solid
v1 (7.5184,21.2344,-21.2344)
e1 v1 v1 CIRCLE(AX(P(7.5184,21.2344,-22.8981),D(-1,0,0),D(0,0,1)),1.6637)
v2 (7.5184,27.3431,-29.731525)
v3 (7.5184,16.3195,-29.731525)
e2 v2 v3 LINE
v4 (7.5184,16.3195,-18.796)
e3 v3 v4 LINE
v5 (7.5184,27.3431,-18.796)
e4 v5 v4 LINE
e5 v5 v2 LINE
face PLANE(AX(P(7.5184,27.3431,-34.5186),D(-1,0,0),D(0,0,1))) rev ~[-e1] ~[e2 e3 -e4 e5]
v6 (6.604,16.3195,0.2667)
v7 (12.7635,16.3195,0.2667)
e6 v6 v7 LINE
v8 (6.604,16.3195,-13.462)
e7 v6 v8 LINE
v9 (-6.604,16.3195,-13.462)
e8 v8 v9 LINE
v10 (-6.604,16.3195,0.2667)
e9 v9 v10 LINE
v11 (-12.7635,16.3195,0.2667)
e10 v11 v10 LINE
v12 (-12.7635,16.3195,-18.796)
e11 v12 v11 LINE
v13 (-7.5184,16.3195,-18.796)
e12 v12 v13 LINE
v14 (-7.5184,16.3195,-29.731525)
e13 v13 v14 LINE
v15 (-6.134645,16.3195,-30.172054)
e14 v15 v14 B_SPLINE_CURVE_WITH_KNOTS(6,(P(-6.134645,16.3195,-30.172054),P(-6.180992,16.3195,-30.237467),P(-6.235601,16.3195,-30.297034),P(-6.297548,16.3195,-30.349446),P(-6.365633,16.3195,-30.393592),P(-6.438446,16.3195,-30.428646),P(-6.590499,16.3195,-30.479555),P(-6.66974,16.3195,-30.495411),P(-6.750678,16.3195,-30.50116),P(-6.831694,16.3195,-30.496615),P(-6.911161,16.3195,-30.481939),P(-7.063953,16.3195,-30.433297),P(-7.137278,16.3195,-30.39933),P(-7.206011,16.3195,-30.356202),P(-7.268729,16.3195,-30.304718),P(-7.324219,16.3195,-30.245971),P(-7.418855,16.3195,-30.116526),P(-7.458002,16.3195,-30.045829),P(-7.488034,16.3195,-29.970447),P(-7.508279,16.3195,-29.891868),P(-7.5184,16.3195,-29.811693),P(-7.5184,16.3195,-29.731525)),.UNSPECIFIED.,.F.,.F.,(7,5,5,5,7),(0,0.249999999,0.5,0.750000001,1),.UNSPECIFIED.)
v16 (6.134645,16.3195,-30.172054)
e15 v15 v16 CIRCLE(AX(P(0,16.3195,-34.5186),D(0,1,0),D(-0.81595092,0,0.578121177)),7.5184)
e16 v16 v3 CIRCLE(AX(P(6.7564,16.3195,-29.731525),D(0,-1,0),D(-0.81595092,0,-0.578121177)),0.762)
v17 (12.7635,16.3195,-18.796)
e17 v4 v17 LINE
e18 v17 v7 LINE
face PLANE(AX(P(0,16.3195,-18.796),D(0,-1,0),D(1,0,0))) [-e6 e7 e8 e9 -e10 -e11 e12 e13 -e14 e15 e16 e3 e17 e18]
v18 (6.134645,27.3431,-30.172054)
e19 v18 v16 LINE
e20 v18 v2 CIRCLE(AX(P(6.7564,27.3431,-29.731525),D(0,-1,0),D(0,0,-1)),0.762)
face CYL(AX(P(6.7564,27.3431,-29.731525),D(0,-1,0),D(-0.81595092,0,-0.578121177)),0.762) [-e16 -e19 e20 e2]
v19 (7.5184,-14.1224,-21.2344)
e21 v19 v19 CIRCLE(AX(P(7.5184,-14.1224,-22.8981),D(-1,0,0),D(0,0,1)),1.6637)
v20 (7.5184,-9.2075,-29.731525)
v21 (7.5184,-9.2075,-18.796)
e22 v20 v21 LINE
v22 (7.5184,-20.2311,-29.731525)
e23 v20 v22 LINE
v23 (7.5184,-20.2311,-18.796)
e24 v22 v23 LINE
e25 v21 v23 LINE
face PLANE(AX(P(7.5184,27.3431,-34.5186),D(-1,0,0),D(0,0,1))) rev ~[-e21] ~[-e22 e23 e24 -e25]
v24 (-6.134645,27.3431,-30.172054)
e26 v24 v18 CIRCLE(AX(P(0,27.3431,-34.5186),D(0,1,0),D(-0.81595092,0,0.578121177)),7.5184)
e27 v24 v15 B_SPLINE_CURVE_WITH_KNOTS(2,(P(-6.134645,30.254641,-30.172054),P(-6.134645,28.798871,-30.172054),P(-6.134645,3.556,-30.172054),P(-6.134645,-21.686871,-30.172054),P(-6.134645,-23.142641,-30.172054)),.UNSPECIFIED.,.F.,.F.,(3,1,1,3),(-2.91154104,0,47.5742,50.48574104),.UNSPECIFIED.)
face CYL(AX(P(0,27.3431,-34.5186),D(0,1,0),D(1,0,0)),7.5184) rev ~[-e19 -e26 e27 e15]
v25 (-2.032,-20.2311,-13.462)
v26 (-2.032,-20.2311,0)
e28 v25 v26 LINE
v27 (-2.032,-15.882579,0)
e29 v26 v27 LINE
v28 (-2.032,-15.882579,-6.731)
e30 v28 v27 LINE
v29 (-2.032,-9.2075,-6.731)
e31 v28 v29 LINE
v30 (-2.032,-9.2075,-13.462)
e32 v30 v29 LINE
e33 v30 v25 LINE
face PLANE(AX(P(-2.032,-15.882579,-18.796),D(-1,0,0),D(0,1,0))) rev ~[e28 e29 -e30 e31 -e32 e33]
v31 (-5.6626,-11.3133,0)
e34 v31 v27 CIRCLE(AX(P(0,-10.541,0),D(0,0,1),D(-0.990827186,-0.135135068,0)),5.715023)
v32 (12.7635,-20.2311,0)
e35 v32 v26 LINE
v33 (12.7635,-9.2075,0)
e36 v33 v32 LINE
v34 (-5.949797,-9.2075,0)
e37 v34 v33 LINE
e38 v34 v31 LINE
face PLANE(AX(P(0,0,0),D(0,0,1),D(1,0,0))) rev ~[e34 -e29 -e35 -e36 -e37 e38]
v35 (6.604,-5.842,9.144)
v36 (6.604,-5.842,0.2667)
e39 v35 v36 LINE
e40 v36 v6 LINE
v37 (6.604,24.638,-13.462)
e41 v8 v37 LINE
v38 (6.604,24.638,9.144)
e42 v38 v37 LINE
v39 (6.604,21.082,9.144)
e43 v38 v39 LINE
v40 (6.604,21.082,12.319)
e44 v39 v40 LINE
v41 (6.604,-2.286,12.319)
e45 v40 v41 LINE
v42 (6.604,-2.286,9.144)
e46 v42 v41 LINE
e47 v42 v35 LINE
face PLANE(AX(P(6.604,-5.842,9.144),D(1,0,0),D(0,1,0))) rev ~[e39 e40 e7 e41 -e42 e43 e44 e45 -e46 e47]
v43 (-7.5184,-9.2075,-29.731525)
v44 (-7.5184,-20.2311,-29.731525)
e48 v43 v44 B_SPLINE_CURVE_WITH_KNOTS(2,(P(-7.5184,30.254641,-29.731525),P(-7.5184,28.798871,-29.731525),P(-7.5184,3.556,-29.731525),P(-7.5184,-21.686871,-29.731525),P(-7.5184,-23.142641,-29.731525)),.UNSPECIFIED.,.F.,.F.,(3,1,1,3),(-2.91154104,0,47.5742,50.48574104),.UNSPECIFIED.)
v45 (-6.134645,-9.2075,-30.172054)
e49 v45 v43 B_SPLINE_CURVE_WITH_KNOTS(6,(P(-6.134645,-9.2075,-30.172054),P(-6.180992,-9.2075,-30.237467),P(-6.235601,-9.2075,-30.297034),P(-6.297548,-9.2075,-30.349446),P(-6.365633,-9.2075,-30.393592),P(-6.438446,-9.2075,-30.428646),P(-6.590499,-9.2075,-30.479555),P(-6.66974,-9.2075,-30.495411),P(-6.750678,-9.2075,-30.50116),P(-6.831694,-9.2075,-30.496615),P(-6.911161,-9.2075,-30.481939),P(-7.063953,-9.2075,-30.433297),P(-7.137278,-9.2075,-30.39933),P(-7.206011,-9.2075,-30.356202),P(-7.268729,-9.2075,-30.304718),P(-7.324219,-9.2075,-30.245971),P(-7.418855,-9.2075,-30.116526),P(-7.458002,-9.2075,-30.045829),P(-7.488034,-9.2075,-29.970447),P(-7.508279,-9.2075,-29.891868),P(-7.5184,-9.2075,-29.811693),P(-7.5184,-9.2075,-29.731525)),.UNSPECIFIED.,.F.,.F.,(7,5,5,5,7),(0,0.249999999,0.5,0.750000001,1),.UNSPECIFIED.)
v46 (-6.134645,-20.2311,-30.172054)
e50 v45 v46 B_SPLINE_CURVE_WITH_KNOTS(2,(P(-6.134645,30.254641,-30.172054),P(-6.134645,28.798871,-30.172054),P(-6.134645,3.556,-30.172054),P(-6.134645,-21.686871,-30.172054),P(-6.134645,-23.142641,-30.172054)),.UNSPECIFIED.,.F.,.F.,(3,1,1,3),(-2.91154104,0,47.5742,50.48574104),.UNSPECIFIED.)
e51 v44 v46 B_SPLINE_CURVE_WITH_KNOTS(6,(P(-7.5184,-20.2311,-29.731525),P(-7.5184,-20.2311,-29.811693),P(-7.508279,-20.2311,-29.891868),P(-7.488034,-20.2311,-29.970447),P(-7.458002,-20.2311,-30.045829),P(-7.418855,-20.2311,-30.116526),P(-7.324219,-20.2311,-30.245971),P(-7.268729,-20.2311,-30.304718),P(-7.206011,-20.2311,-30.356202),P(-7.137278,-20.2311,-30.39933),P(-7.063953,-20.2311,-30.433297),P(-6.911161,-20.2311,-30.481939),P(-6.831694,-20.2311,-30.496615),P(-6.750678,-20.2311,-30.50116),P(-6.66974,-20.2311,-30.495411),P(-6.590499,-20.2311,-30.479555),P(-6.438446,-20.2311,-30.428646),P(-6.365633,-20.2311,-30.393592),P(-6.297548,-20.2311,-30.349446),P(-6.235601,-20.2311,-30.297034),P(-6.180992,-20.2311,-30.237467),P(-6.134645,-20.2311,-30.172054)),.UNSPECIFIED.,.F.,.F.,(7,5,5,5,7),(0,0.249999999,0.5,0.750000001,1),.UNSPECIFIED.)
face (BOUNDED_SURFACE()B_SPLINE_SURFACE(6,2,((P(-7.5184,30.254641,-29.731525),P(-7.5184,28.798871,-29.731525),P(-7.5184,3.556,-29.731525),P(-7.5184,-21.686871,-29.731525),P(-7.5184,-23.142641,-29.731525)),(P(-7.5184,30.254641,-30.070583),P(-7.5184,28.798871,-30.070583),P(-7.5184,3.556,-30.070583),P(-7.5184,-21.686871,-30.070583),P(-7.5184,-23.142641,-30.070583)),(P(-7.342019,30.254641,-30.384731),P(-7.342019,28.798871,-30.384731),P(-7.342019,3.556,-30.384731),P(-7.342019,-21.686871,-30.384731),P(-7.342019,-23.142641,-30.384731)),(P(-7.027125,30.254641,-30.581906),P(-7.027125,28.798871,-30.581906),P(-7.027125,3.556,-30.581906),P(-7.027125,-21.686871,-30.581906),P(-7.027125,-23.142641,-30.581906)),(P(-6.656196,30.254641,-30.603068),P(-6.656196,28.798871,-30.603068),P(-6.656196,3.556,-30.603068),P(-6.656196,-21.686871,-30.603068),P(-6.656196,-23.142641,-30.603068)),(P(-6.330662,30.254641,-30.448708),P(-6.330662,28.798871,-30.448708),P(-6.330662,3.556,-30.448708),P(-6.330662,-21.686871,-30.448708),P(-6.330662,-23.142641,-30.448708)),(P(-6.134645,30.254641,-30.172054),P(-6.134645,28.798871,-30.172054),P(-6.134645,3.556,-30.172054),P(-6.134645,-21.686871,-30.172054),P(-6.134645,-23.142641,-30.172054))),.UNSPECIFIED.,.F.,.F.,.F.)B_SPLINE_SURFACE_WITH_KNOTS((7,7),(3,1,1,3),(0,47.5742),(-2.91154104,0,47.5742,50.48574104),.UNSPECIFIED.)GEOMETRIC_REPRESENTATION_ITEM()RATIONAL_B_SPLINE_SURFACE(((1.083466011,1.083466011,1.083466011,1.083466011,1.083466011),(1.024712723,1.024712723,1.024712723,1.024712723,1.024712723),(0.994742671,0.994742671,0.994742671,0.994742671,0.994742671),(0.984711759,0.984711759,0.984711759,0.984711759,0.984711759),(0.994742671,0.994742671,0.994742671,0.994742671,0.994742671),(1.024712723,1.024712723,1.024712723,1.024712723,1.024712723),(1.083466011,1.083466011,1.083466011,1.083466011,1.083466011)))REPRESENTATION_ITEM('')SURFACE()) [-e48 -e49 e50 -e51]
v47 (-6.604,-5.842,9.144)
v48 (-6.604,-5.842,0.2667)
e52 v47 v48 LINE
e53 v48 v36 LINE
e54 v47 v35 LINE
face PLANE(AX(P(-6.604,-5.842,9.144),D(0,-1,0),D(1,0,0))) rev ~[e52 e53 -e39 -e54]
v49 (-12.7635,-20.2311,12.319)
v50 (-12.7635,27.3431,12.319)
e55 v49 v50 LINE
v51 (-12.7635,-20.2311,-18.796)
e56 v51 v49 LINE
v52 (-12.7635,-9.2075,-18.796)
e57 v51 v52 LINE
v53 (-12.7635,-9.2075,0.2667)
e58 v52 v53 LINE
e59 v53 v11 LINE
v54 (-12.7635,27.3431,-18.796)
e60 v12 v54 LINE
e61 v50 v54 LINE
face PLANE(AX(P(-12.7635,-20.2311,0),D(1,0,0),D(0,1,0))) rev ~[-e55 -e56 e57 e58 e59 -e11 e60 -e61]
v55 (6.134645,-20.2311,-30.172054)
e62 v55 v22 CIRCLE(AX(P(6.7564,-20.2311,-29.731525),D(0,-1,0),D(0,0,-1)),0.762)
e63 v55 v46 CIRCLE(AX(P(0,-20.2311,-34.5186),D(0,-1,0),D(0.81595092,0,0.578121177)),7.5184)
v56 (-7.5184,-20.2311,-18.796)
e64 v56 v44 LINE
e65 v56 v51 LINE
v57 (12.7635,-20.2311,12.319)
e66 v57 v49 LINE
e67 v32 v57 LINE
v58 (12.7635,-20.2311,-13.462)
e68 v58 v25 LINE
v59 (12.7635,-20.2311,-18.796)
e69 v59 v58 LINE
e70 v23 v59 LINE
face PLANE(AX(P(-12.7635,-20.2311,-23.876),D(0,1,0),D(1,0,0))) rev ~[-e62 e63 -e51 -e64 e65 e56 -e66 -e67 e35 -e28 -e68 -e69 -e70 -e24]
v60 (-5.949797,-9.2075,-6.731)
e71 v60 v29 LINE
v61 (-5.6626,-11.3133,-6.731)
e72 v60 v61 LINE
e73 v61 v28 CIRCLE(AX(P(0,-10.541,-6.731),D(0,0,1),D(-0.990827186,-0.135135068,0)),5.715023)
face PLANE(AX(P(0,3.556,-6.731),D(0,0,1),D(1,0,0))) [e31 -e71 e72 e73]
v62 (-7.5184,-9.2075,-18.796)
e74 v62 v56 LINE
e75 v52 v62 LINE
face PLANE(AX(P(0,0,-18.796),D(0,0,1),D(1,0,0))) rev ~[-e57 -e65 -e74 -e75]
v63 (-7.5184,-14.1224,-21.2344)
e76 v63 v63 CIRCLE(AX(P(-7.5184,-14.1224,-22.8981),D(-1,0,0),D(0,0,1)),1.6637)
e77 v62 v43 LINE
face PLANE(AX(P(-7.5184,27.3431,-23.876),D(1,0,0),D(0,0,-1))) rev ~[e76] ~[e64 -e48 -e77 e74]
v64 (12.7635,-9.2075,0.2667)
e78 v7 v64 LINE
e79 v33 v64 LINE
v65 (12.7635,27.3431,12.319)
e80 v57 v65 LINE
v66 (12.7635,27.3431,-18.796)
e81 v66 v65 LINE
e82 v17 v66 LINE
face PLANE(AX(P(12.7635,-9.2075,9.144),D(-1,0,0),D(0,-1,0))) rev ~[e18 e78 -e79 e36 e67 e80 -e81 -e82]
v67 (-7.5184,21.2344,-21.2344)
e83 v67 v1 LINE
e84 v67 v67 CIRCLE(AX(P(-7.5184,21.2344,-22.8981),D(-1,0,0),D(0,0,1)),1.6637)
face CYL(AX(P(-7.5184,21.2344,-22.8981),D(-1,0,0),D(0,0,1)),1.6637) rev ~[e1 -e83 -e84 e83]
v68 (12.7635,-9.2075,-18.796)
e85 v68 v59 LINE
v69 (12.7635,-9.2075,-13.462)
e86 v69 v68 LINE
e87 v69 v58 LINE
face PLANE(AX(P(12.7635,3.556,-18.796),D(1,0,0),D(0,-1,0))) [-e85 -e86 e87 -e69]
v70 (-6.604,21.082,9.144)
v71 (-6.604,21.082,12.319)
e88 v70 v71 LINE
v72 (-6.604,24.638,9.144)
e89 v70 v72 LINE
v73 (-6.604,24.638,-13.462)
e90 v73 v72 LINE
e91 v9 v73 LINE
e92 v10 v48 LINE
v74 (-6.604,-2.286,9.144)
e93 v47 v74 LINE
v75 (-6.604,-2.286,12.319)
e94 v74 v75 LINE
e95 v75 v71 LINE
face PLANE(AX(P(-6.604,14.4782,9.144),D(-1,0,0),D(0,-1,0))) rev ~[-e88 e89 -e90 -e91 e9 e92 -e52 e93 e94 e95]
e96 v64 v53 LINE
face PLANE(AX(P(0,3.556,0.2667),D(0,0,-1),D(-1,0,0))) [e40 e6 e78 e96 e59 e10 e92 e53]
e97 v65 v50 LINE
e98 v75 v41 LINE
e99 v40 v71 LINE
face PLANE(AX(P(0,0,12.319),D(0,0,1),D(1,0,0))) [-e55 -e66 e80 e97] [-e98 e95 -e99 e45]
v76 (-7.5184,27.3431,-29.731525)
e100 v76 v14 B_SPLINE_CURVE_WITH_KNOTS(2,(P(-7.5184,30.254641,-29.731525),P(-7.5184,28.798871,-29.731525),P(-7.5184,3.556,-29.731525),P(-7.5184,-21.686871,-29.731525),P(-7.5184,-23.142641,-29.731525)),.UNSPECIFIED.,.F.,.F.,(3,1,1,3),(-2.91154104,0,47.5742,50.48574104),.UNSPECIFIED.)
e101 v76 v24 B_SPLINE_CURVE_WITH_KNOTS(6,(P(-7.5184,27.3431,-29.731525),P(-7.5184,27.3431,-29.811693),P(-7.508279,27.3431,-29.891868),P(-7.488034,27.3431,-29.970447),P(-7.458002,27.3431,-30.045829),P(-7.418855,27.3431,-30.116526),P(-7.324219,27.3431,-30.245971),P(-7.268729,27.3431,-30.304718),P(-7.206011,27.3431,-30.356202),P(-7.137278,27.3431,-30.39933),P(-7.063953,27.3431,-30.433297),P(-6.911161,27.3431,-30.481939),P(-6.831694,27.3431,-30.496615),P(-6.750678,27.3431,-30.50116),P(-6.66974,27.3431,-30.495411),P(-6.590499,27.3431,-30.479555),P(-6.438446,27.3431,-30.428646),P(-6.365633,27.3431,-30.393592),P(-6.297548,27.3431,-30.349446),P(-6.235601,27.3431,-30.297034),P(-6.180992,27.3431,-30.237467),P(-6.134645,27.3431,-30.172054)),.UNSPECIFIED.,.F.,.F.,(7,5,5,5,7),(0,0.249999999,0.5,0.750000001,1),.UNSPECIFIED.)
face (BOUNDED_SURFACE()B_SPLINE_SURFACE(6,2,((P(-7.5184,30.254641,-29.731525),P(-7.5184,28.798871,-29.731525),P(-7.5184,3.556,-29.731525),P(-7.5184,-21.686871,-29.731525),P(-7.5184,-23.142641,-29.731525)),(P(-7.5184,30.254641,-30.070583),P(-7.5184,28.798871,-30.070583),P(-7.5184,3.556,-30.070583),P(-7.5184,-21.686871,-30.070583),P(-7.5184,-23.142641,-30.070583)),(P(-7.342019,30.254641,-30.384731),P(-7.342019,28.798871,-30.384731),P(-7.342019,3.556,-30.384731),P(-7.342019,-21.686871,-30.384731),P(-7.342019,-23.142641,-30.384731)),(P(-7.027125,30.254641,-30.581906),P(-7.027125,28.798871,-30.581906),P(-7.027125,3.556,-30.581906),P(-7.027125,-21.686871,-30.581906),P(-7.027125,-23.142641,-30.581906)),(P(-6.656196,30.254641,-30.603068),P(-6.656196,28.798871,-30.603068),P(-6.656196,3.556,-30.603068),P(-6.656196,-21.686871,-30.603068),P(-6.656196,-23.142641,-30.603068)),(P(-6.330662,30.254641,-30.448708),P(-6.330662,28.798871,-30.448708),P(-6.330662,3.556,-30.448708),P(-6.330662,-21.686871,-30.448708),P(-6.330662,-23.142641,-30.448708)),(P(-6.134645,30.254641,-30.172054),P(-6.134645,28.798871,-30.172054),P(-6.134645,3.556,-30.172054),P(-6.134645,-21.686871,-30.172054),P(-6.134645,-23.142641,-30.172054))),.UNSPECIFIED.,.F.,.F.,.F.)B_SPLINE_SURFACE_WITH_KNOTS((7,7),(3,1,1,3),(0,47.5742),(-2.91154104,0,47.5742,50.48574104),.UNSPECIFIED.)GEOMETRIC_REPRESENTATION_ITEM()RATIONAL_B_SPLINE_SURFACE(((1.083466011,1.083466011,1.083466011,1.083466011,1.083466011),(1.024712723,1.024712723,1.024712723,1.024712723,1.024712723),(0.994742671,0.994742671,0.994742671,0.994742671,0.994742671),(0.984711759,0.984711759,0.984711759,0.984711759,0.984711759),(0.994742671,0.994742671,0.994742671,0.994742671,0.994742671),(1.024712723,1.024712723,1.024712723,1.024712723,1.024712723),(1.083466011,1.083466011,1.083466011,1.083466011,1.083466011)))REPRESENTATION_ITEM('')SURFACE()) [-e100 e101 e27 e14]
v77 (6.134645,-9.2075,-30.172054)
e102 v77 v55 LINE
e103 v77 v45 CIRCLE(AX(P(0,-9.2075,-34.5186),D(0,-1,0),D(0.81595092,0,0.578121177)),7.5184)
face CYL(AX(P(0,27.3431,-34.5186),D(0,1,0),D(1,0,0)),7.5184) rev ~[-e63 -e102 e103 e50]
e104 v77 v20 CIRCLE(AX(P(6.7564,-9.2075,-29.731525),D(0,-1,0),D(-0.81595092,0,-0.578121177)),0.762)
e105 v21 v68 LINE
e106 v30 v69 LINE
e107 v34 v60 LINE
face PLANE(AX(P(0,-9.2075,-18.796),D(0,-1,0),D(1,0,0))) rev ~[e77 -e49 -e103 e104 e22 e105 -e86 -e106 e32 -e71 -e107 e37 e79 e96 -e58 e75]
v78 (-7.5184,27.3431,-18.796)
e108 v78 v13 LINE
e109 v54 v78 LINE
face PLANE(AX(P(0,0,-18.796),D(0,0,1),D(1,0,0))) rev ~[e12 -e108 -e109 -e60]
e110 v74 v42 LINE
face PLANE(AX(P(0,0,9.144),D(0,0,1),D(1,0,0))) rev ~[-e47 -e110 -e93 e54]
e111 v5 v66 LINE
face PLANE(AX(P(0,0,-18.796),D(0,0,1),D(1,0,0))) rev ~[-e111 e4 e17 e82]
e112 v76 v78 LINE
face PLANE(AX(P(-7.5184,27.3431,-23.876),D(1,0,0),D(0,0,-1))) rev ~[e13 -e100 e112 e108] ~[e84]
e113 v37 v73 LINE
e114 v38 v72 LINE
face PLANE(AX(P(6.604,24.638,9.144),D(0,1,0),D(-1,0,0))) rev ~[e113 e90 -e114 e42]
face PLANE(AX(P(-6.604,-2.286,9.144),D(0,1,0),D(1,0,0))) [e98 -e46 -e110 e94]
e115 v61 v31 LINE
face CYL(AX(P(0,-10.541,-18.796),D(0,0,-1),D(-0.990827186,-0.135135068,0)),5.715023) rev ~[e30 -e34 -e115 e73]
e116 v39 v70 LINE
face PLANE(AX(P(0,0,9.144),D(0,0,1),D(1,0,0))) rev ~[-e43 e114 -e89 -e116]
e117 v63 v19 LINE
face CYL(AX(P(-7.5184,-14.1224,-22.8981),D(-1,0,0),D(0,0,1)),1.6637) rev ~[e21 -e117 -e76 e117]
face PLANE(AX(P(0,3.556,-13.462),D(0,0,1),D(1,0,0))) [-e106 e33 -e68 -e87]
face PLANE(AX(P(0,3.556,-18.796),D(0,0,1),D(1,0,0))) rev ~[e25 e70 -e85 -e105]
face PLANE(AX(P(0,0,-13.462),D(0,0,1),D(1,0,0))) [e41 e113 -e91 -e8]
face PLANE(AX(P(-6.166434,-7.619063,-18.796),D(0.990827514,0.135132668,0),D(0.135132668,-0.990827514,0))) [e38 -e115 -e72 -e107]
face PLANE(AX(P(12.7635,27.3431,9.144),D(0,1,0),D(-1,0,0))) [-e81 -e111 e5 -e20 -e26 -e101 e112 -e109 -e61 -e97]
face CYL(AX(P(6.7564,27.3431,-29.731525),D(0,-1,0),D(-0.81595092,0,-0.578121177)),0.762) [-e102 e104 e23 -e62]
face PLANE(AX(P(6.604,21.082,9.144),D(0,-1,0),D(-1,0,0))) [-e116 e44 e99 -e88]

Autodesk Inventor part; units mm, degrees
ref_plane "YZ Plane" through (0, 0, 0) normal (1, 0, 0) x (0, 1, 0)
sketch "Servo Containment" plane through (0, 0, 0) normal (0, 0, 1) x (1, 0, 0)
  line L0 (-22.2827, 48.831) -> (-35.4907, 48.831)
  line L1 (-35.4907, 48.831) -> (-35.4907, 18.351)
  line L2 (-35.4907, 18.351) -> (-22.2827, 18.351)
  line L3 (-22.2827, 18.351) -> (-22.2827, 48.831)
  line L4 (-22.2827, 45.275) -> (-35.4907, 45.275)
  line L5 (-35.4907, 45.275) -> (-35.4907, 21.907)
  line L6 (-35.4907, 21.907) -> (-22.2827, 21.907)
  line L7 (-22.2827, 21.907) -> (-22.2827, 45.275)
  line L8 (-28.8867, 18.351) -> (-28.8867, 21.907) construction
  line L9 (-28.8867, 45.275) -> (-28.8867, 48.831) construction
  line L10 (-28.8867, 21.907) -> (-28.8867, 27.749)
  point P0 (-28.8867, 33.0211)
  dimension "d0" = 13.208
  dimension "d1" = 30.48
  dimension "d2" = 23.368
  dimension "d4" = 5.842
sketch "zdstj" plane through (0, 0, 0) normal (0, 0, 1) x (1, 0, 0)
  line L0 (-10.4838, -7.9303) -> (-9.9261, -12.0195)
  arc A0 (-9.9261, -12.0195) -> (1.399, -12.0195) centre (-4.2636, -11.2472) ccw
  point P0 (-6.5265, -10.9007)
ref_plane "Work Plane1" through (0, 0, 0) normal (0, 0, 1) x (1, 0, 0)
sketch "Sketch1" plane through (0, 0, 0) normal (0, 0, 1) x (1, 0, 0)
  arc A0 (6.2203, -7.2241) -> (-6.2203, -7.2241) centre (0, 3.556) ccw projected
  line L0 (2.032, 8.0666) -> (2.032, -8.723) projected
  arc A1 (4.826, -6.5243) -> (4.826, 13.6363) centre (0, 3.556) ccw projected
  arc A2 (2.032, -8.723) -> (-2.032, -8.723) centre (0, 3.556) ccw projected
  line L1 (-12.7635, 27.3431) -> (12.7635, 27.3431)
  line L2 (12.7635, 27.3431) -> (12.7635, -20.2311)
  line L3 (12.7635, -20.2311) -> (-12.7635, -20.2311)
  line L4 (-12.7635, -20.2311) -> (-12.7635, 27.3431)
  arc A3 (-5.6626, -11.3133) -> (5.6626, -11.3133) centre (0, -10.541) ccw projected
  line L5 (-6.2203, -7.2241) -> (-5.6626, -11.3133) projected
  line L6 (-6.2203, -7.2241) -> (-6.2203, -20.2311)
  circle A4 centre (0, 3.556) radius 12.7635
  line L7 (14.097, 3.556) -> (0, 3.556)
  line L8 (6.604, 24.638) -> (-6.604, 24.638)
  line L9 (-6.604, 24.638) -> (-6.604, -5.842)
  line L10 (-6.604, -5.842) -> (6.604, -5.842)
  line L11 (6.604, -5.842) -> (6.604, 24.638)
  line L12 (6.604, 21.082) -> (-6.604, 21.082)
  line L13 (-6.604, 21.082) -> (-6.604, -2.286)
  line L14 (-6.604, -2.286) -> (6.604, -2.286)
  line L15 (6.604, -2.286) -> (6.604, 21.082)
  line L16 (0, -5.842) -> (0, -2.286) construction
  line L17 (0, 21.082) -> (0, 24.638) construction
  line L18 (0, -2.286) -> (0, 3.556)
  line L19 (10.7801, 9.7763) -> (14.8693, 9.2186)
  arc A5 (14.8693, 9.2186) -> (14.8693, -2.1066) centre (14.097, 3.556) cw
  point P0 (0, 0)
  point P1 (0, 3.556)
  point P2 (0, -19.05)
  point P3 (12.7635, 27.3431)
  point P4 (-12.7635, -20.2311)
  point P5 (6.604, 14.4782)
  point P6 (11.1751, 9.7224)
  point P7 (12.7635, 9.5058)
  point P8 (-12.7635, 3.556)
  point P9 (-6.604, 14.4782)
  point P10 (-6.604, 14.1054)
  point P11 (6.604, 14.1054)
  point P12 (-6.2203, -7.5892)
ref_plane "Work Plane2" through (-12.7635, 27.3431, -23.876) normal (0, 1, 0) x (1, 0, 0)
sketch "Sketch2" plane through (-12.7635, 27.3431, -23.876) normal (0, 1, 0) x (1, 0, 0)
  arc A0 (17.5895, 10.6426) -> (7.9375, 10.6426) centre (12.7635, 10.6426) ccw projected
  line L0 (17.5895, 0) -> (17.5895, 10.6426) projected
  line L1 (7.9375, 10.6426) -> (7.9375, 0) projected
  arc A1 (20.2819, 10.6426) -> (5.2451, 10.6426) centre (12.7635, 10.6426) ccw projected
  line L2 (20.2819, 10.6426) -> (20.2819, 0) projected
  line L3 (20.2819, 10.6426) -> (20.2819, 0) projected
  line L4 (25.527, -5.08) -> (25.527, 18.796) projected
  line L5 (0, 18.796) -> (25.527, 18.796) projected
  line L6 (0, -5.08) -> (0, 18.796) projected
  line L7 (5.2451, 0) -> (5.2451, 10.6426) projected
  arc A2 (20.2819, 10.6426) -> (5.2451, 10.6426) centre (12.7635, 10.6426) ccw projected
  circle A3 centre (12.7635, 10.6426) radius 7.5184
  line L8 (20.2819, 0) -> (20.32, 0) projected
  line L9 (20.32, 0) -> (20.32, -5.08) projected
  line L10 (25.527, -5.08) -> (20.32, -5.08) projected
  line L11 (5.207, -5.08) -> (0, -5.08) projected
  line L12 (5.207, 0) -> (5.207, -5.08) projected
  line L13 (5.207, 0) -> (5.2451, 0) projected
  line L14 (5.207, -5.08) -> (20.32, -5.08)
  line L15 (20.2819, 0) -> (20.2819, -5.08)
  line L16 (5.2451, 0) -> (5.2451, -5.08)
  point P0 (12.7635, -23.876)
  point P1 (20.2819, 10.6426)
  point P2 (5.2451, 10.6426)
ref_plane "Work Plane3" through (-12.7635, -20.2311, -42.672) normal (0, -1, 0) x (1, 0, 0)
extrude "Extrusion1" add sketch "Sketch2" against normal up to surface (47.5742 mm away) contours A3 L2 L15 L14 L16 L7
fillet "Fillet1" radius 0.762 2 edges at (-7.5184, 3.556, -34.5186) (7.5184, 3.556, -34.5186)
extrude "Extrusion2" add sketch "Sketch1" against normal up to surface (18.796 mm away) contours A4 L11 L8 L9 L4 L1 L2 L19 | A4 L9 L12 L11 | L3 L4 A4 L6 | L12 L9 L8 L11
sketch "Sketch3" plane through (-7.5184, -20.2311, -23.876) normal (-1, 0, 0) x (0, 0, 1)
  circle A0 centre (0.9779, 6.1087) radius 1.6637 projected
  circle A1 centre (0.9779, 41.4655) radius 1.6637 projected
  point P0 (23.876, 20.2311)
extrude "Extrusion3" cut sketch "Sketch3" against normal blind 25.4
sketch "Sketch7" plane through (0, 3.556, -18.796) normal (0, 0, 1) x (1, 0, 0)
  circle A0 centre (0, 0) radius 12.7635 projected
  line L0 (12.7635, 23.7871) -> (12.7635, -23.7871) projected
  line L1 (12.7635, -23.7871) -> (-12.7635, -23.7871) projected
  line L2 (-12.7635, 23.7871) -> (12.7635, 23.7871) projected
  line L3 (-12.7635, -23.7871) -> (-12.7635, 23.7871) projected
  line L4 (-6.2203, -11.1452) -> (-6.2203, -23.7871) projected
  arc A1 (-5.6626, -14.8693) -> (5.6626, -14.8693) centre (0, -14.097) ccw projected
  line L5 (-6.2203, -10.7801) -> (-5.6626, -14.8693) projected
  line L6 (-2.032, -23.7871) -> (-2.032, 22.087)
  line L7 (0, -23.7871) -> (0, 23.7871)
  line L8 (12.7635, 5.9498) -> (11.1751, 6.1664) projected
  point P0 (0, -3.556)
  point P1 (-2.032, -19.4386)
  point P2 (-6.1664, -11.1751)
  point P3 (12.7635, 0)
  point P4 (-2.032, -12.6007)
  dimension "d17" = 2.032
extrude "Extrusion4" add sketch "Sketch7" along normal blind 5.334 contours L0 L1 L7 A0 | A0 L8 L0 | L7 A1 L6 A0 | L6 A1 L5 A0 | L7 L1 L6 A1 | L5 A1 L6 L1 L4 A0
extrude "Extrusion5" add sketch "Sketch7" along normal up to surface (18.796 mm away) contours L5 A1 L6 L1 L4 A0
extrude "Extrusion6" cut sketch "Sketch7" along normal mid plane 55.5625 contours A0 L7 | A0 L6 L7 | A0 L6
ref_plane "Work Plane4" through (-6.2203, -16.256, -6.731) normal (0, 0, -1) x (0, 1, 0)
extrude "Extrusion7" add sketch "Sketch7" along normal up to surface (12.065 mm away) contours L6 A1 L5 A0
ref_plane "Work Plane5" through (0, 0, 9.144) normal (0, 0, 1) x (1, 0, 0)
sketch "Sketch14" plane through (0, 0, 9.144) normal (0, 0, 1) x (1, 0, 0)
  line L0 (-12.7635, -20.2311) -> (-12.7635, 27.3431) projected
  line L1 (12.7635, 27.3431) -> (-12.7635, 27.3431) projected
  line L2 (12.7635, 27.3431) -> (12.7635, -20.2311) projected
  line L3 (12.7635, -20.2311) -> (-12.7635, -20.2311) projected
  line L4 (-6.604, 24.638) -> (-6.604, -5.842) projected
  line L5 (-6.604, -5.842) -> (6.604, -5.842) projected
  line L6 (6.604, -5.842) -> (6.604, 24.638) projected
  line L7 (6.604, 24.638) -> (-6.604, 24.638) projected
  line L8 (6.604, 21.082) -> (-6.604, 21.082) projected
  line L9 (-6.604, -2.286) -> (6.604, -2.286) projected
  arc A0 (11.1751, 9.7224) -> (-12.7635, 3.556) centre (0, 3.556) ccw projected
  line L10 (0, 16.3195) -> (12.7635, 16.3195)
  arc A1 (-2.032, -9.0447) -> (12.7635, 3.556) centre (0, 3.556) ccw projected
  line L11 (0, -9.2075) -> (12.7635, -9.2075)
  point P0 (0, 0)
extrude "Extrusion8" add sketch "Sketch14" against normal up to surface (9.144 mm away) contours L0 A0 L4 L5 L6 L10 L2 A1 L11 L3 | L0 L1 L2 L10 L6 L7 L4 A0 | L11 A1 L2
extrude "Extrusion9" add sketch "Sketch14" along normal blind 3.175 contours L0 A0 L4 L5 L6 L10 L2 A1 L11 L3 | L0 L1 L2 L10 L6 L7 L4 A0 | L11 A1 L2 | L4 L7 L6 L8 | L9 L6 L5 L4
extrude "Extrusion10" cut sketch "Sketch14" against normal up to surface (22.606 mm away) contours A0 L6 L9 L4 | L4 L8 L6 L10 A0 | L4 L7 L6 L8 | L10 L6 A0
sketch "Sketch15" plane through (0, 3.556, -18.796) normal (0, 0, -1) x (-1, 0, 0)
  line L0 (0, -12.7635) -> (-22.033, -12.7635)
  line L1 (-22.033, -12.7635) -> (-22.033, 12.7635)
  line L2 (0, 12.7635) -> (-22.033, 12.7635)
  line L3 (-22.033, -12.7635) -> (27.2623, -12.7635)
  line L4 (27.2623, -12.7635) -> (27.2623, 12.7635)
  line L5 (27.2623, 12.7635) -> (-22.033, 12.7635)
  line L6 (-22.033, 12.7635) -> (-22.033, -12.7635)
  point P0 (0, -3.556)
  point P1 (0, -12.7635)
extrude "Extrusion11" cut sketch "Sketch15" along normal blind 14.2875 and the other way blind 19.0627
properties part number "Servo Mount V4"
